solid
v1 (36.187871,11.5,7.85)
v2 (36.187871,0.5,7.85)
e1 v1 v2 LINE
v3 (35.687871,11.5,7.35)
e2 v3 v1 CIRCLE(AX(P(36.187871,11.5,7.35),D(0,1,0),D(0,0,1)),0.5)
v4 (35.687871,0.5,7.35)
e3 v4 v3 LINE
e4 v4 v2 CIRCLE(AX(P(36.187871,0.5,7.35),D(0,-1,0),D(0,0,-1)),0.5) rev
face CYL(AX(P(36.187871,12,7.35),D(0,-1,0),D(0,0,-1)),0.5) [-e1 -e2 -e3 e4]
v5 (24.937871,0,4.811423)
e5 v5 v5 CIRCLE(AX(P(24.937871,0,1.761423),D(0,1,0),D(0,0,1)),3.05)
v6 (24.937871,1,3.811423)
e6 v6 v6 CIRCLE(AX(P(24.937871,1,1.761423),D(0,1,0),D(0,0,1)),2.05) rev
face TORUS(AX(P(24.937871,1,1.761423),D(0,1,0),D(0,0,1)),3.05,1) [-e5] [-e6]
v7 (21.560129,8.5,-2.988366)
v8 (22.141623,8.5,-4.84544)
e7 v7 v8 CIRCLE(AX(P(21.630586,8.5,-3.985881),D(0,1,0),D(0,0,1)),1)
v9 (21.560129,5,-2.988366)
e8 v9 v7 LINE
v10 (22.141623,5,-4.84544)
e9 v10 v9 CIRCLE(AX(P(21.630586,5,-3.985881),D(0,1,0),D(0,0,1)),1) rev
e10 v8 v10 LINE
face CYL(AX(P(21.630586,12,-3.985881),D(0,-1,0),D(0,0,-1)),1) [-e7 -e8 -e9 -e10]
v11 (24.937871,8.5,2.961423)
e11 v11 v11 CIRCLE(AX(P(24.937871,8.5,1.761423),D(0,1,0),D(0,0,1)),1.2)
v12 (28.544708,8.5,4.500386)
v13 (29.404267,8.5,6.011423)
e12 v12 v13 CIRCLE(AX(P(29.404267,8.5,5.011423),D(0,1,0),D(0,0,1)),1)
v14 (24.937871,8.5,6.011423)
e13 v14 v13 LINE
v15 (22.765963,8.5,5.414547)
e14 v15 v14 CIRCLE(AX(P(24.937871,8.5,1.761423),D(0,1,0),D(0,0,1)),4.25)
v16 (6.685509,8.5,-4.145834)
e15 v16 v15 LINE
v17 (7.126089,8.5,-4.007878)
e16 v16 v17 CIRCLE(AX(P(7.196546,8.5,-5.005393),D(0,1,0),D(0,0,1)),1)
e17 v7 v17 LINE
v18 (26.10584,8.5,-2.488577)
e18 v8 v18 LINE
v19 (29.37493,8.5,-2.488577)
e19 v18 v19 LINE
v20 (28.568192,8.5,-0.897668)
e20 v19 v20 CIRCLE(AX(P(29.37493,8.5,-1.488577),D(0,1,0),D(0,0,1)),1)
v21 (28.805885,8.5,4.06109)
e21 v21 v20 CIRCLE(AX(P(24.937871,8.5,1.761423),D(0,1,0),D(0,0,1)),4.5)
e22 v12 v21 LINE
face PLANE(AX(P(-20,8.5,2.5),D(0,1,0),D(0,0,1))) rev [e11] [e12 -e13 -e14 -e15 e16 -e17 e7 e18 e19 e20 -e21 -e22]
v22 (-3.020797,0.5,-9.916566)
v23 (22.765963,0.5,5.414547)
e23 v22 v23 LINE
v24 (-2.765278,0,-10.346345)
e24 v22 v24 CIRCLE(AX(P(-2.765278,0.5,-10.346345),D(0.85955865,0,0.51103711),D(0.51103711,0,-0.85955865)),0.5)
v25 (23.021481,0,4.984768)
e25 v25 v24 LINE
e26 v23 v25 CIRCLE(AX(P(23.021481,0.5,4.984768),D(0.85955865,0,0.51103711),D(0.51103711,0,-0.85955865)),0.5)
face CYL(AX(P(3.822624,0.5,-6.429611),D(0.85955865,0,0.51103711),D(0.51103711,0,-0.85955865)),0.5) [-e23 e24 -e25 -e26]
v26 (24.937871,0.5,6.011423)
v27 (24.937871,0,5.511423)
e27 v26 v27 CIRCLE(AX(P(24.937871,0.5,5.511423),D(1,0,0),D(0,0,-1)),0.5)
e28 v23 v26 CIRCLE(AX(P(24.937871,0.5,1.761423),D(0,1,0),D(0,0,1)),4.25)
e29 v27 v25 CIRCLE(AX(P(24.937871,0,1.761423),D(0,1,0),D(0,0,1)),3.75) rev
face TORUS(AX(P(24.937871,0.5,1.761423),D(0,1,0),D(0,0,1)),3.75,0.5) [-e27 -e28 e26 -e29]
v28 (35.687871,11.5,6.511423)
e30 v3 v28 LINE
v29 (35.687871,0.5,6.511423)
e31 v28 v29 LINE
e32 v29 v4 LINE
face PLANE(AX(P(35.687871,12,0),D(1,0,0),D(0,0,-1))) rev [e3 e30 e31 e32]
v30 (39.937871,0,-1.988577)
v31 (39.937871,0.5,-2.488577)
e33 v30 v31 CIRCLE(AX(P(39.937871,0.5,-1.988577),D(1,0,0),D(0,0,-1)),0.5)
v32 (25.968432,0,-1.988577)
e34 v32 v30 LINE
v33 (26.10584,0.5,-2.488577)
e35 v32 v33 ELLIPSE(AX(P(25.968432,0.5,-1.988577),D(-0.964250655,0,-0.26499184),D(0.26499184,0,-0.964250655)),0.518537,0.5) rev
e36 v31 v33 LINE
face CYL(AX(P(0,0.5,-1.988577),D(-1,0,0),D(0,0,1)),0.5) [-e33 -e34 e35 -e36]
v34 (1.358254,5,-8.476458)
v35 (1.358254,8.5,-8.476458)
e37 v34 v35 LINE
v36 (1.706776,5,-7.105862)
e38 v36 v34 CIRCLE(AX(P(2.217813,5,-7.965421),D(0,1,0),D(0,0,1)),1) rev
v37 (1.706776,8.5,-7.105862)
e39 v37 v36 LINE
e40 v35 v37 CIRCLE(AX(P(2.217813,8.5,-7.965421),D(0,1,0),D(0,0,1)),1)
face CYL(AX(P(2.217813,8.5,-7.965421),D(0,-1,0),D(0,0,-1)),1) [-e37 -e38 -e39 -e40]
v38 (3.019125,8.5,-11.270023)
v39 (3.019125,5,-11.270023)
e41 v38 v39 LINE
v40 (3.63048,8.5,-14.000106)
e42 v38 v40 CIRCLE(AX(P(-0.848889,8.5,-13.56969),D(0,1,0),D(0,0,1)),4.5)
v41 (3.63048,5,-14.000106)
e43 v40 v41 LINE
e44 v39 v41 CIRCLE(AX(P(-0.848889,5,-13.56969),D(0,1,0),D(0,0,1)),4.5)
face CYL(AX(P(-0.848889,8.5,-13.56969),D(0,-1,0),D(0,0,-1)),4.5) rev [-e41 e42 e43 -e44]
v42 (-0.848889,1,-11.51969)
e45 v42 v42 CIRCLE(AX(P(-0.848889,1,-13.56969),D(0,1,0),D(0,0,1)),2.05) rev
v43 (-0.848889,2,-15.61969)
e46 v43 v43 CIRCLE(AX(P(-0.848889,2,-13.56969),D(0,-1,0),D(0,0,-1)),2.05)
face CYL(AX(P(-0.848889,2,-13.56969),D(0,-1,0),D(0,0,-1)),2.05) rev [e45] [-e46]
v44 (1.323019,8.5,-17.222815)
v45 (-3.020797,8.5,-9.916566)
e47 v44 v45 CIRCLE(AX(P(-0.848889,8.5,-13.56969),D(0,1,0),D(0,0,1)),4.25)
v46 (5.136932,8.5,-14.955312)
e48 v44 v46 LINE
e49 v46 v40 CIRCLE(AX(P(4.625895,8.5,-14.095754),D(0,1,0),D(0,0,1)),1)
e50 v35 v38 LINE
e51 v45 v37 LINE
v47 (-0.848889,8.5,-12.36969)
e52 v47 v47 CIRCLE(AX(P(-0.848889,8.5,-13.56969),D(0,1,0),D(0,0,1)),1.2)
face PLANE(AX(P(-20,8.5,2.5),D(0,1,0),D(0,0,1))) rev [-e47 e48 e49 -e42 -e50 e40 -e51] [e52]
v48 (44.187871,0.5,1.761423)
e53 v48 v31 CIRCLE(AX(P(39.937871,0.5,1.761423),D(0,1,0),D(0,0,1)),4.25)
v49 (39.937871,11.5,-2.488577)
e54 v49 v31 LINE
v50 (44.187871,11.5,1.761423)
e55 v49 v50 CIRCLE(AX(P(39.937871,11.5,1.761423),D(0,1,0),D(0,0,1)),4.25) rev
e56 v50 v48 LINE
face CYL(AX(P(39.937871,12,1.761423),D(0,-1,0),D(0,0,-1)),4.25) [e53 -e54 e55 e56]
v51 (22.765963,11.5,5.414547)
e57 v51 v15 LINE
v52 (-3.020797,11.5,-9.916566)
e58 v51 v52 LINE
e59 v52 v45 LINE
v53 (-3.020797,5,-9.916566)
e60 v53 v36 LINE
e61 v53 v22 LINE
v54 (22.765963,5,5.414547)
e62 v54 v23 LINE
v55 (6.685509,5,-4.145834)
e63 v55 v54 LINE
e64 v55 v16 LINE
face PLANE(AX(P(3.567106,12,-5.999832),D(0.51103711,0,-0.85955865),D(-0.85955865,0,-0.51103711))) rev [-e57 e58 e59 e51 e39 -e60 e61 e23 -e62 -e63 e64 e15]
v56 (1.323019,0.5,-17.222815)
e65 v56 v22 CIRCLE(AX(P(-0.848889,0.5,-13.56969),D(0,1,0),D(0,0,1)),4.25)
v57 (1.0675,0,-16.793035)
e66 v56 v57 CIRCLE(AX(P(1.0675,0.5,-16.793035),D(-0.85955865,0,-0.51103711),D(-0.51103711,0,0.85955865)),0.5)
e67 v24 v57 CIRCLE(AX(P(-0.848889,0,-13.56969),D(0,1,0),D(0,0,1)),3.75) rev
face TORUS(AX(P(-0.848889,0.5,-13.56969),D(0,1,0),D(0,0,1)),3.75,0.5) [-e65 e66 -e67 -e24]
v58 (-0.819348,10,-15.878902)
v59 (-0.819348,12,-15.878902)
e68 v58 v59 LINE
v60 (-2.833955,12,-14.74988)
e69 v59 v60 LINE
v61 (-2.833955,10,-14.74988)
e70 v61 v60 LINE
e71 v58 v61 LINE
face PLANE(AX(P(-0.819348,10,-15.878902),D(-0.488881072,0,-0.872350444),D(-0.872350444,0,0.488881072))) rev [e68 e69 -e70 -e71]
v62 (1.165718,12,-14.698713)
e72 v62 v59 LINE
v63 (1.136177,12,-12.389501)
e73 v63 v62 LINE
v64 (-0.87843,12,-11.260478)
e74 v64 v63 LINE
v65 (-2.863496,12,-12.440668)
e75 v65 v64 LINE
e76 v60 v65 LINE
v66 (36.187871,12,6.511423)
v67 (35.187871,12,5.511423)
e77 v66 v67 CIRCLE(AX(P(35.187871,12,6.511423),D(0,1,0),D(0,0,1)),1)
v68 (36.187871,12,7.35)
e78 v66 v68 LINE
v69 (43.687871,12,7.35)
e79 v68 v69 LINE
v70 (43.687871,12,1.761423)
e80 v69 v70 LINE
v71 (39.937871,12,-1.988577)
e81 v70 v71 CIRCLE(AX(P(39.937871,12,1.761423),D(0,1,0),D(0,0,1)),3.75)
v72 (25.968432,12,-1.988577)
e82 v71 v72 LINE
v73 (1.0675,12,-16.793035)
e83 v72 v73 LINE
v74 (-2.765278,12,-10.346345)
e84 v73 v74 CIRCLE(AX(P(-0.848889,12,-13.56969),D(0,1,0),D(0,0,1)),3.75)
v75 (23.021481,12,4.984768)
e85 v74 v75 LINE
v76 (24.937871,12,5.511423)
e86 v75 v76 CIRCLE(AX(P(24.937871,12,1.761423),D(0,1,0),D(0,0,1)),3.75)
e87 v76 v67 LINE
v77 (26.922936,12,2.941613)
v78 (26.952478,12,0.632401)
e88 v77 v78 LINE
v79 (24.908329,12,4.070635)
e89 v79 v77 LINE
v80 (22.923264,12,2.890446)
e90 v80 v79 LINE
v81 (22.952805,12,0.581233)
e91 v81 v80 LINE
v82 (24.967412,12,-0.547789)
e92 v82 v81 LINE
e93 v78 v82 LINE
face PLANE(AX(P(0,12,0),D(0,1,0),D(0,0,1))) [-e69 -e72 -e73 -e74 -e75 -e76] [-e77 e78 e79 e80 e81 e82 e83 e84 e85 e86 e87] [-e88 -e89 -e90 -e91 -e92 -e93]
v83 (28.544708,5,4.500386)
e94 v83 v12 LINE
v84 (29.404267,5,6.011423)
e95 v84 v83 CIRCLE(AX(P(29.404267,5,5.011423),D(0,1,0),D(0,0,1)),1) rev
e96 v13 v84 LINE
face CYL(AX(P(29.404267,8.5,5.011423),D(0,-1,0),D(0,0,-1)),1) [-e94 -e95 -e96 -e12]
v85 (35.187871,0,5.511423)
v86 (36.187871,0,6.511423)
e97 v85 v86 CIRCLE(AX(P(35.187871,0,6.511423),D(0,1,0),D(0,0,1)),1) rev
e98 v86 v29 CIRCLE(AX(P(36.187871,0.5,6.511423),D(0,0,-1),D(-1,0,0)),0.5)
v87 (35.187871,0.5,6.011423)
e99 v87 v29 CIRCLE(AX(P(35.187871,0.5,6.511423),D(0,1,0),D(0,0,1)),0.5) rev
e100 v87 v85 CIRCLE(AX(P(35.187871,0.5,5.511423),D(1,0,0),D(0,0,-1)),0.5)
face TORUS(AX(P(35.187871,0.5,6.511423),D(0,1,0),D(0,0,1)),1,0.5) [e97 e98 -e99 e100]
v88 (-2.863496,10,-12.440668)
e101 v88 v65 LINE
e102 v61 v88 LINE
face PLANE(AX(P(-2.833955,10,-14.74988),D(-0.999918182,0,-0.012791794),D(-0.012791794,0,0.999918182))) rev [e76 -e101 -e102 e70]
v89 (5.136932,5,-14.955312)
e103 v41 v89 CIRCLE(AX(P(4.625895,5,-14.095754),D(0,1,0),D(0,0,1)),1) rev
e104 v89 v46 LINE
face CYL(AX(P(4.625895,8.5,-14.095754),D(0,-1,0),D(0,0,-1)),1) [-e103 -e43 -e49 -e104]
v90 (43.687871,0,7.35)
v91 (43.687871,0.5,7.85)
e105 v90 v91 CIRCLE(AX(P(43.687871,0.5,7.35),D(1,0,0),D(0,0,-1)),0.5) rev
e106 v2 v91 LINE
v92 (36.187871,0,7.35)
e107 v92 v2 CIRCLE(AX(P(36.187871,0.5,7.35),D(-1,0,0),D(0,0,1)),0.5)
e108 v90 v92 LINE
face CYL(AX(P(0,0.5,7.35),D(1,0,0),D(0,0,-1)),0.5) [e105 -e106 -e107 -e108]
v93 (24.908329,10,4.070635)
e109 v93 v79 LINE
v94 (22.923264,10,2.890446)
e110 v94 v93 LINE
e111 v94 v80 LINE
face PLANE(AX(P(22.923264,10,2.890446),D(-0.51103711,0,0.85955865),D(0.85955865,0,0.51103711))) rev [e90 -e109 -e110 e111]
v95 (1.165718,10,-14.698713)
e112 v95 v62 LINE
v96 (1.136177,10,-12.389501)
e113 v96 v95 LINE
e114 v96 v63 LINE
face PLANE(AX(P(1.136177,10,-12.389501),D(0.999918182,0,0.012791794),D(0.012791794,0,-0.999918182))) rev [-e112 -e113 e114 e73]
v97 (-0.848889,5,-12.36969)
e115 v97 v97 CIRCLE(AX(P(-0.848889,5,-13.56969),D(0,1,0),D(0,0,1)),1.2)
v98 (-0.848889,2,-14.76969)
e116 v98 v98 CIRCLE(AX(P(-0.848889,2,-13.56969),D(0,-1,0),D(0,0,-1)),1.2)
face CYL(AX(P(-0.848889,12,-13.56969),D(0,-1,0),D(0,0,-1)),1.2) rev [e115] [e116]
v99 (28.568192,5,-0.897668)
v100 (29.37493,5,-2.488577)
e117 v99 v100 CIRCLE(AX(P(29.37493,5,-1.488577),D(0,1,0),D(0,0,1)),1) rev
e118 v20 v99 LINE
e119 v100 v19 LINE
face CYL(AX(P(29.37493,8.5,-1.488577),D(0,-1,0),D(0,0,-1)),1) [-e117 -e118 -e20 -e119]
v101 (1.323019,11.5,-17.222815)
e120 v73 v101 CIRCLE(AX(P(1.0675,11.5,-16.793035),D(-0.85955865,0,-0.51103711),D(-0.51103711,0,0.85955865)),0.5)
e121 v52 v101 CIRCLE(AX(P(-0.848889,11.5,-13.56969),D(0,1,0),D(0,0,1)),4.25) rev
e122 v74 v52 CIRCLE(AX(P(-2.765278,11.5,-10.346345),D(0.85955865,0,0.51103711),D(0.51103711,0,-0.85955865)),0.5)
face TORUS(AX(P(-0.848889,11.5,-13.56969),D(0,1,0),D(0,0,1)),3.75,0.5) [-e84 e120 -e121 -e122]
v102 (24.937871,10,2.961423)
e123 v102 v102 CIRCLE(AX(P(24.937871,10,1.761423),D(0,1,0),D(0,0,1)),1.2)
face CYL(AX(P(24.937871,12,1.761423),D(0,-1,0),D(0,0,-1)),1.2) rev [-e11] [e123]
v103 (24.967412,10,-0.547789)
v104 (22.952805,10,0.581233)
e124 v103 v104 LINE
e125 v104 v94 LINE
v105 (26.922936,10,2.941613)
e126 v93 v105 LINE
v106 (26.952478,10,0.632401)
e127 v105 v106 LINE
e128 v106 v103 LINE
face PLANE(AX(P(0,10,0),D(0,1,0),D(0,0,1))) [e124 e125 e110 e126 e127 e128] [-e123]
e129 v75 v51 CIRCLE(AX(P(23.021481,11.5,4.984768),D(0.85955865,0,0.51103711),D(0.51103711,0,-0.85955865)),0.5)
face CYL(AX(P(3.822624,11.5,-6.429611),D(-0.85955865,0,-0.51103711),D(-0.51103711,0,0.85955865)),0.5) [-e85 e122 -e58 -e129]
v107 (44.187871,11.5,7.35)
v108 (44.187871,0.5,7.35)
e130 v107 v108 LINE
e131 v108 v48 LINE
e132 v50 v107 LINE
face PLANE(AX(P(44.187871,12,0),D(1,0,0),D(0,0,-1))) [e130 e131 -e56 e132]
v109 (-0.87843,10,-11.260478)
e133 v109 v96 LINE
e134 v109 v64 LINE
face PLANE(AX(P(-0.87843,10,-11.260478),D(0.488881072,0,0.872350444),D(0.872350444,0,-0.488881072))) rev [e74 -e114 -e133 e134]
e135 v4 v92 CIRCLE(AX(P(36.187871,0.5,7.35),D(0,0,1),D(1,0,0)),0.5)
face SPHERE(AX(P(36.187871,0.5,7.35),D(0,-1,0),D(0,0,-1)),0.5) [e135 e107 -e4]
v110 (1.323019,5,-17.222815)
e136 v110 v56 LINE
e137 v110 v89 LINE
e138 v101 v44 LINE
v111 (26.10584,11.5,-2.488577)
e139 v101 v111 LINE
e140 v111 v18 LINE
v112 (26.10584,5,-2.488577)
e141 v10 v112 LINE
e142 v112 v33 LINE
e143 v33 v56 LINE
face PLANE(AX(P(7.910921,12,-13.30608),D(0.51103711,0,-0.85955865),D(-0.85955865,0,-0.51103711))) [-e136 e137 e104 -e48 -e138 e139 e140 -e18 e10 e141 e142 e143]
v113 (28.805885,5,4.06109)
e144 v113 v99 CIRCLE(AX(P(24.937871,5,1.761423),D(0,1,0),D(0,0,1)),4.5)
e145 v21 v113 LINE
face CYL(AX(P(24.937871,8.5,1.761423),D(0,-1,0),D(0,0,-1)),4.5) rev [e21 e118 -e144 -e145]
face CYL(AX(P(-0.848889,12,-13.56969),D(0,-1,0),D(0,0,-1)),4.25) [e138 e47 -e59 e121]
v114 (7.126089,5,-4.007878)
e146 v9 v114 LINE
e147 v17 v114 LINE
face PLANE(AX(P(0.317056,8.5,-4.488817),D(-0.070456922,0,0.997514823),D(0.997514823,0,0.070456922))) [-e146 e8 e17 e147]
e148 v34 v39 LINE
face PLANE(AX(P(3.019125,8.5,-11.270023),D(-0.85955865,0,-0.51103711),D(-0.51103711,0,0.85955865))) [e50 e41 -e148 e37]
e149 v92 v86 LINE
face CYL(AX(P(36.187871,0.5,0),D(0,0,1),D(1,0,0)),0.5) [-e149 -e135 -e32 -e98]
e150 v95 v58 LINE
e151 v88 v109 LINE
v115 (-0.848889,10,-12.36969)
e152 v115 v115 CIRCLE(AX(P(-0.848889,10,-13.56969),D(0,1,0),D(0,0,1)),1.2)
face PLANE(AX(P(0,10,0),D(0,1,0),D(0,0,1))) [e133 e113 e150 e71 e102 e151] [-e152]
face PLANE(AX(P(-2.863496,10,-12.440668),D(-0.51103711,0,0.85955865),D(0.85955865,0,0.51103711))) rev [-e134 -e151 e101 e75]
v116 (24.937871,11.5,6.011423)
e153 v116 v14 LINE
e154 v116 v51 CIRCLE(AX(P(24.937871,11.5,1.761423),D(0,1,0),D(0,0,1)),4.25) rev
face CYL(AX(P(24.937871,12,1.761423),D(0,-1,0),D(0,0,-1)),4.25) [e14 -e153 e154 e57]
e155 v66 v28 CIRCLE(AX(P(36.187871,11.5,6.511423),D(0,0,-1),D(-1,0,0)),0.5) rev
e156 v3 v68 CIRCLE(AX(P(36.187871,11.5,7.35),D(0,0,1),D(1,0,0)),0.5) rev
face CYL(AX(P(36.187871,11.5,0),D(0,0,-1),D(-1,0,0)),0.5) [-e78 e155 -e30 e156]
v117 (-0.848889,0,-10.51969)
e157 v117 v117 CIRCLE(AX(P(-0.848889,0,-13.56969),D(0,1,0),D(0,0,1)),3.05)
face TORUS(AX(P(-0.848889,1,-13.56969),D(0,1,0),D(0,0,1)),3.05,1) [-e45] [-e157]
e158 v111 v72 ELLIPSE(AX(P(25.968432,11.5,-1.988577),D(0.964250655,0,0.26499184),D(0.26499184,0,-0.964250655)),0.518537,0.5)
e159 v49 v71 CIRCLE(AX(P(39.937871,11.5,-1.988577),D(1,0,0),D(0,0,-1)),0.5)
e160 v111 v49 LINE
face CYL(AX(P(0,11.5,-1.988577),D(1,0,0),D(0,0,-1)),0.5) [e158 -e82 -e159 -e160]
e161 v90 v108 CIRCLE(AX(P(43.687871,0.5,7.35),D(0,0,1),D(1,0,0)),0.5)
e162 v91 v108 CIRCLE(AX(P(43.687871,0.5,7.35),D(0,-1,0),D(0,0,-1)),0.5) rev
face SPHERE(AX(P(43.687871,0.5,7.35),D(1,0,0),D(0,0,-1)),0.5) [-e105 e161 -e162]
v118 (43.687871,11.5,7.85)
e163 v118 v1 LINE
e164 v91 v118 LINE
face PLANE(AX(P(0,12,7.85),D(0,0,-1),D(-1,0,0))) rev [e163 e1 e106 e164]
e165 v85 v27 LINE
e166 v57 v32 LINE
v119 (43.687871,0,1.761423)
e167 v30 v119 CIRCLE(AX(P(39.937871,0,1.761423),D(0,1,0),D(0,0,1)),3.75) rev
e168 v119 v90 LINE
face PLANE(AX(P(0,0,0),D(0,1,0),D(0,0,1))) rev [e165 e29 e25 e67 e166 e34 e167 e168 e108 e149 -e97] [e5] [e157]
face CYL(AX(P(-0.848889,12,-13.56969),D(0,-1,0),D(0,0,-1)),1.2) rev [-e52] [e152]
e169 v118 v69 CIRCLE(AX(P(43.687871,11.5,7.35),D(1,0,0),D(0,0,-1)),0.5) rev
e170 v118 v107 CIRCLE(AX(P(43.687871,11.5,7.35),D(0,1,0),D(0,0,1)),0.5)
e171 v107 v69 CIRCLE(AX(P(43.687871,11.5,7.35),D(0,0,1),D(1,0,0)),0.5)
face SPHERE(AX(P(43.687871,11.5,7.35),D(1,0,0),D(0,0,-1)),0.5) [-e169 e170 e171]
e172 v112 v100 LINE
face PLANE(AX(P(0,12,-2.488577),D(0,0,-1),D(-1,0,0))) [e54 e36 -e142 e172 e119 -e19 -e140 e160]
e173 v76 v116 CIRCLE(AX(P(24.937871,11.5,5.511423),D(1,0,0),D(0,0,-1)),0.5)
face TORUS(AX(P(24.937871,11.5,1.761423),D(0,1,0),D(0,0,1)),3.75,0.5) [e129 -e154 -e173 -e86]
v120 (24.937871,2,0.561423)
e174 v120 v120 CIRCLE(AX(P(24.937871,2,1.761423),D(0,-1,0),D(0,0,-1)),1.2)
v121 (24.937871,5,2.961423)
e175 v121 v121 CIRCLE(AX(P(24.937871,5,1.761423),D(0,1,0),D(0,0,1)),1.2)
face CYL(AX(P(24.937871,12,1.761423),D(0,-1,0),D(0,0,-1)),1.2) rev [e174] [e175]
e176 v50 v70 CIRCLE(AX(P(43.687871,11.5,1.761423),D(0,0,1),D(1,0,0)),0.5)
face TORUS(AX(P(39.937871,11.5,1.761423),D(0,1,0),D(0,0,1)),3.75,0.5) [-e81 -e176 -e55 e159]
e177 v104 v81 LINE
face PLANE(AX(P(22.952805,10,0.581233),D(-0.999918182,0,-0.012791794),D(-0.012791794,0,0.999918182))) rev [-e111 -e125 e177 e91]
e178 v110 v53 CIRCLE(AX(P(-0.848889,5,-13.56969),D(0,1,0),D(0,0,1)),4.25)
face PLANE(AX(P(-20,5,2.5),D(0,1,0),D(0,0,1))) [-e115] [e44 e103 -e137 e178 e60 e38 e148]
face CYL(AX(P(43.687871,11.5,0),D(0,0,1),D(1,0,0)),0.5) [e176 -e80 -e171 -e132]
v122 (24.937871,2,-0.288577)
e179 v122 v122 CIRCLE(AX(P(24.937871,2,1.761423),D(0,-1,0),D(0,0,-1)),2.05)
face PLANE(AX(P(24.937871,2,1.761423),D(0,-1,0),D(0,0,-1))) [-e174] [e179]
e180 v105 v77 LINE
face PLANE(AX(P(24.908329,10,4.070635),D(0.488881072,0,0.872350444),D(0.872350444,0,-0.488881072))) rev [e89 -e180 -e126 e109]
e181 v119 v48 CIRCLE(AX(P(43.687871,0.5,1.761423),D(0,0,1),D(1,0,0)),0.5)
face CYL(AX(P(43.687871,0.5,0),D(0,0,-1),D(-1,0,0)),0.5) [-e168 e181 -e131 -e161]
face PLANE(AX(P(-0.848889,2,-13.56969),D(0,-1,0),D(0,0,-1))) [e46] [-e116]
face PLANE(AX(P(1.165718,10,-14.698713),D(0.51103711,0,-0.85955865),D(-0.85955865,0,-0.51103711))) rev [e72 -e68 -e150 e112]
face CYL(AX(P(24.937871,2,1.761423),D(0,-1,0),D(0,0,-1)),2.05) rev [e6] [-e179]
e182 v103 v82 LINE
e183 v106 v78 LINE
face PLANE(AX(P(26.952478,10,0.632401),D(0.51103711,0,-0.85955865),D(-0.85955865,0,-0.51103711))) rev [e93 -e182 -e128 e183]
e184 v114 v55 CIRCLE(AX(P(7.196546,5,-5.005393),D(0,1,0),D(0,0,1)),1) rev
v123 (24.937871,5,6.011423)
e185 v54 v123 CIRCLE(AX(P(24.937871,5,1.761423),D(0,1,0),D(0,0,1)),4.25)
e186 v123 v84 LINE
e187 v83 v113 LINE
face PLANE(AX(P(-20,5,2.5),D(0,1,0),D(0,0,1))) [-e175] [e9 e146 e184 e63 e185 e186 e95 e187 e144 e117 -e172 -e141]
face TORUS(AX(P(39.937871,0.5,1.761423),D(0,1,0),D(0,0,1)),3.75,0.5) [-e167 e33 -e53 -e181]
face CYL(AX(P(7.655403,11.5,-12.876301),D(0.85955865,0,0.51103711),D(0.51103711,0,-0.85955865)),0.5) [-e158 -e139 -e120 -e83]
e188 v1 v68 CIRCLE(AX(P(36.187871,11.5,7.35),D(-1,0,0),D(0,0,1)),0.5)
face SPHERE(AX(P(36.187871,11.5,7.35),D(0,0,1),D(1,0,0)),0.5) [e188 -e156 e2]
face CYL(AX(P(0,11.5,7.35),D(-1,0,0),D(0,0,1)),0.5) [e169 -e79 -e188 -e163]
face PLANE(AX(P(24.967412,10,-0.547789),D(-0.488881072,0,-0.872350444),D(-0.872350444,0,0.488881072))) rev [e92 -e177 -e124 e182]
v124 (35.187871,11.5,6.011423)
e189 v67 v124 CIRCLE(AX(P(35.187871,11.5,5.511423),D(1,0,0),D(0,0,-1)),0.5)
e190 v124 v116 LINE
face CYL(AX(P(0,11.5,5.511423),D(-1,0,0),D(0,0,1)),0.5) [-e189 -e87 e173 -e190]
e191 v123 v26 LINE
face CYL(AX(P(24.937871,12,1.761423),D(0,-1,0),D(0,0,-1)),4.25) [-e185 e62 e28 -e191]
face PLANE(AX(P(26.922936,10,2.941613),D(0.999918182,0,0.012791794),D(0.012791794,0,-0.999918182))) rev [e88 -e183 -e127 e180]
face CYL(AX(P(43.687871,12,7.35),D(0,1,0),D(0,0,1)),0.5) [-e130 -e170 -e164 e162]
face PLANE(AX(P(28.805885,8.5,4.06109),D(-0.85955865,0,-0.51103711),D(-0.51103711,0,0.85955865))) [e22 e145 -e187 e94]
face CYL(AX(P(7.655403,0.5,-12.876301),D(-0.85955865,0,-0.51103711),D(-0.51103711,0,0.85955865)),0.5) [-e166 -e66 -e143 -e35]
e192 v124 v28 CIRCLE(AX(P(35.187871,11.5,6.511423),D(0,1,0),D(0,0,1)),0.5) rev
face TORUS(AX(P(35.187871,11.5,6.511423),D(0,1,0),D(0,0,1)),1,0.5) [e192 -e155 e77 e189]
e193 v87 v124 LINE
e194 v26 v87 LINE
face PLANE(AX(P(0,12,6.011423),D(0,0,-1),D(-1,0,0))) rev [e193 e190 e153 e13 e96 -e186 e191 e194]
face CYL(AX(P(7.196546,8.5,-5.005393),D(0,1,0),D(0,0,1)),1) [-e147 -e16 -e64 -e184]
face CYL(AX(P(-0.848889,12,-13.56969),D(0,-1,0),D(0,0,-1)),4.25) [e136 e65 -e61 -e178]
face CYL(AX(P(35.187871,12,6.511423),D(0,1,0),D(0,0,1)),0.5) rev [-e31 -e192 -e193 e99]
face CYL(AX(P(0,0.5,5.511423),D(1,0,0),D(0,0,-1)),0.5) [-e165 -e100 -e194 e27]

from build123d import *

# Parameters (mm, degrees)
SKETCH1_R               = 1.2
BOSS_EXTRUDE1_DEPTH     = 12
CUT_EXTRUDE1_DEPTH      = 2.5
CUT_EXTRUDE1_DEPTH_BACK = 1
CUT_EXTRUDE2_DEPTH      = 2
SKETCH5_R               = 2.05
CUT_EXTRUDE3_DEPTH      = 2
FILLET1_R               = 1
FILLET2_R               = 0.5


with BuildPart() as part:
    # Sketch1 → Boss-Extrude1 (new body)
    with BuildSketch(Plane(origin=(0, 0, 0), x_dir=(1, 0, 0), z_dir=(0, 1, 0))):
        with BuildLine():
            Line((1.323018794, 17.222814504), (26.105840038, 2.488576956))
            Line((26.105840038, 2.488576956), (39.937870576, 2.488576956))
            ThreePointArc((39.937870576, 2.488576956), (42.943074396, 1.243780776), (44.187870576, -1.761423044))
            Line((44.187870576, -1.761423044), (44.187870576, -7.85))
            Line((44.187870576, -7.85), (35.687870576, -7.85))
            Line((35.687870576, -7.85), (35.687870576, -6.011423044))
            Line((35.687870576, -6.011423044), (24.937870576, -6.011423044))
            ThreePointArc((24.937870576, -6.011423044), (23.811655258, -5.859488326), (22.76596286, -5.414547306))
            Line((22.76596286, -5.414547306), (-3.020796638, 9.91656598))
            ThreePointArc((-3.020796638, 9.91656598), (-4.502013184, 15.741597958), (1.323018794, 17.222814504))
        make_face()
        with Locations(Location((-0.848888922, 13.569690242, 0), (0, 0, 270))):
            Circle(SKETCH1_R, mode=Mode.SUBTRACT)
        with Locations(Location((24.937870576, -1.761423044, 0), (0, 0, 270))):
            Circle(SKETCH1_R, mode=Mode.SUBTRACT)
    extrude(amount=BOSS_EXTRUDE1_DEPTH)

    # Sketch3 → Cut-Extrude1 (cut, two sides: drawn at the far end of the back side and taken through both)
    with BuildSketch(Plane(origin=(0, 6, 0), x_dir=(1, 0, 0), z_dir=(0, 1, 0)).offset(-CUT_EXTRUDE1_DEPTH_BACK)):
        with BuildLine():
            Line((-22.892544244, 0.947199994), (-3.741433166, 17.016890236))
            ThreePointArc((-3.741433166, 17.016890236), (2.065644543, 16.998318931), (3.019125003, 11.270023249))
            Line((3.019125003, 11.270023249), (-1.084785494, 4.367292117))
            ThreePointArc((-1.084785494, 4.367292117), (-0.38864398, 4.483185905), (0.317056148, 4.488816704))
            Line((0.317056148, 4.488816704), (25.254926724, 2.72739366))
            ThreePointArc((25.254926724, 2.72739366), (28.925298394, 0.324342858), (28.805884501, -4.061090037))
            Line((28.805884501, -4.061090037), (16.029956762, -25.550056285))
            ThreePointArc((16.029956762, -25.550056285), (9.862275844, -27.118403217), (8.293928913, -20.950722299))
            Line((8.293928913, -20.950722299), (17.339631919, -5.735951945))
            Line((17.339631919, -5.735951945), (-0.317056148, -4.488816704))
            ThreePointArc((-0.317056148, -4.488816704), (-2.876129239, -3.460907482), (-4.354991754, -1.1331579))
            Line((-4.354991754, -1.1331579), (-9.756802736, -10.218942999))
            ThreePointArc((-9.756802736, -10.218942999), (-15.508332614, -12.006129032), (-17.885892009, -6.472473713))
            ThreePointArc((-17.885892009, -6.472473713), (-23.730198417, -5.017065706), (-22.892544244, 0.947199994))
        make_face()
    extrude(amount=CUT_EXTRUDE1_DEPTH + CUT_EXTRUDE1_DEPTH_BACK, mode=Mode.SUBTRACT)

    # Sketch4 → Cut-Extrude2 (cut)
    with BuildSketch(Plane(origin=(0, 12, 0), x_dir=(1, 0, 0), z_dir=(0, 1, 0))):
        Polygon((22.952804904, -0.581233393), (22.923263521, -2.890445518), (24.908329193, -4.07063517), (26.922936248, -2.941612695), (26.952477631, -0.63240057), (24.967411959, 0.547789081), align=None)
        Polygon((1.13617675, 12.389500591), (1.165718133, 14.698712717), (-0.819347539, 15.878902368), (-2.833954594, 14.749879893), (-2.863495977, 12.440667768), (-0.878430305, 11.260478117), align=None)
    extrude(amount=-CUT_EXTRUDE2_DEPTH, mode=Mode.SUBTRACT)

    # Sketch5 → Cut-Extrude3 (cut)
    with BuildSketch(Plane.XZ):
        with Locations(Location((-0.848888922, -13.569690242, 0), (0, 0, 270))):
            Circle(SKETCH5_R)
        with Locations(Location((24.937870576, 1.761423044, 0), (0, 0, 270))):
            Circle(SKETCH5_R)
    extrude(amount=-CUT_EXTRUDE3_DEPTH, mode=Mode.SUBTRACT)

    # Fillet1
    # the kernel refuses this fillet: 1 mm, written as the material it takes off along each edge
    with BuildSketch(Plane(origin=(26.416890522, 8.5, -2.488576956), x_dir=(1, 0, 0), z_dir=(0, -1, 0)), Plane(origin=(2.594323181, 8.5, -16.466980426), x_dir=(0.8595586499303869, 0, 0.511037109542791), z_dir=(0, -1, 0))) as fillet1_piece_1:
        with BuildLine():
            CenterArc((2.958039892, 1), FILLET1_R, 143.77845338, 126.22154662)
            ThreePointArc((2.151301739, 1.590909091), (1.196627809, 0.631863865), (0, 0))
            Line((0, 0), (2.958039892, 0))
        make_face()
    extrude(amount=3.5, mode=Mode.SUBTRACT)
    with BuildSketch(Plane(origin=(27.64634461, 5, 6.011423044), x_dir=(1, 0, 0), z_dir=(0, 1, 0))) as fillet1_piece_2:
        with BuildLine():
            CenterArc((FILLET1_R * 1.75792205647, FILLET1_R), FILLET1_R, 149.267064192, 120.732935808)
            Line((FILLET1_R * 0.89836340654, FILLET1_R * 1.51103710954), (0, 0))
            Line((0, 0), (FILLET1_R * 1.75792205647, 0))
        make_face()
    extrude(amount=3.5, mode=Mode.SUBTRACT)
    with BuildSketch(Plane(origin=(6.889434617, 8.5, -4.024593471), x_dir=(-0.8595586499303914, 0, -0.5110371095427833), z_dir=(0, -1, 0))) as fillet1_piece_3:
        with BuildLine():
            CenterArc((FILLET1_R * 0.237244349344, FILLET1_R), FILLET1_R, 243.307295898, 26.692704102)
            Line((-FILLET1_R * 0.211960885996, FILLET1_R * 0.10657140378), (0, 0))
            Line((0, 0), (FILLET1_R * 0.237244349344, 0))
        make_face()
    extrude(amount=3.5, mode=Mode.SUBTRACT)
    with BuildSketch(Plane(origin=(0.847217287, 5, -7.616898987), x_dir=(0.8595586499303871, 0, 0.5110371095427908), z_dir=(0, 1, 0))) as fillet1_piece_4:
        with BuildLine():
            CenterArc((FILLET1_R, FILLET1_R), FILLET1_R, 180, 90)
            Line((0, FILLET1_R), (0, 0))
            Line((0, 0), (FILLET1_R, 0))
        make_face()
    extrude(amount=3.5, mode=Mode.SUBTRACT)
    with BuildSketch(Plane(origin=(25.838473904, 8.5, -2.647535296), x_dir=(-0.8595586499303872, 0, -0.5110371095427904), z_dir=(0, -1, 0))) as fillet1_piece_5:
        with BuildLine():
            CenterArc((4.300870532, -1), FILLET1_R, 90, 153.307295898)
            Line((3.851665297, -1.893428596), (3.806744773, -1.982771456))
            ThreePointArc((3.806744773, -1.982771456), (0.49748309, -0.318914177), (-0.03286711, -0.094444444))
            Line((-0.03286711, -0.094444444), (0, 0.1))
            Line((0, 0.1), (4.300870532, 0.1))
            Line((4.300870532, 0.1), (4.300870532, 0))
        make_face()
    extrude(amount=3.5, mode=Mode.SUBTRACT)
    with BuildSketch(Plane(origin=(24.937870576, 0, 1.761423044), x_dir=(0, 0, -1), z_dir=(-1, 0, 0))) as fillet1_piece_6:
        with BuildLine():
            CenterArc((2.05 + FILLET1_R, -FILLET1_R), FILLET1_R, 90, 90)
            Line((2.05, -FILLET1_R), (2.05, 0))
            Line((2.05, 0), (2.05 + FILLET1_R, 0))
        make_face()
    revolve(axis=Axis((24.937870576, 0, 1.761423044), (0, -1, 0)), mode=Mode.SUBTRACT)
    with BuildSketch(Plane(origin=(-0.848888922, 0, -13.569690242), x_dir=(0, 0, -1), z_dir=(-1, 0, 0))) as fillet1_piece_7:
        with BuildLine():
            CenterArc((2.05 + FILLET1_R, -FILLET1_R), FILLET1_R, 90, 90)
            Line((2.05, -FILLET1_R), (2.05, 0))
            Line((2.05, 0), (2.05 + FILLET1_R, 0))
        make_face()
    revolve(axis=Axis((-0.848888922, 0, -13.569690242), (0, -1, 0)), mode=Mode.SUBTRACT)

    # Fillet2
    fillet2_edges = [part.edges().sort_by_distance(p)[0] for p in [
        (-4.502013184, 0, -15.741597958),
        (13.714429416, 0, -9.85569573),
        (33.021855307, 0, -2.488576956),
        (42.943074396, 0, -1.243780776),
        (44.187870576, 0, 4.805711522),
        (39.937870576, 0, 7.85),
        (35.687870576, 0, 6.930711522),
        (30.312870576, 0, 6.011423044),
        (9.872583111, 12, -2.251009337),
        (23.811655258, 0, 5.859488326),
        (9.872583111, 0, -2.251009337),
        (23.811655258, 12, 5.859488326),
        (44.187870576, 6, 7.85),
        (35.687870576, 6, 7.85),
        (35.687870576, 6, 6.011423044),
        (30.312870576, 12, 6.011423044),
        (35.687870576, 12, 6.930711522),
        (39.937870576, 12, 7.85),
        (44.187870576, 12, 4.805711522),
        (42.943074396, 12, -1.243780776),
        (33.021855307, 12, -2.488576956),
        (13.714429416, 12, -9.85569573),
        (-4.502013184, 12, -15.741597958),
    ]]
    fillet(fillet2_edges, radius=FILLET2_R)


solid = part.part
